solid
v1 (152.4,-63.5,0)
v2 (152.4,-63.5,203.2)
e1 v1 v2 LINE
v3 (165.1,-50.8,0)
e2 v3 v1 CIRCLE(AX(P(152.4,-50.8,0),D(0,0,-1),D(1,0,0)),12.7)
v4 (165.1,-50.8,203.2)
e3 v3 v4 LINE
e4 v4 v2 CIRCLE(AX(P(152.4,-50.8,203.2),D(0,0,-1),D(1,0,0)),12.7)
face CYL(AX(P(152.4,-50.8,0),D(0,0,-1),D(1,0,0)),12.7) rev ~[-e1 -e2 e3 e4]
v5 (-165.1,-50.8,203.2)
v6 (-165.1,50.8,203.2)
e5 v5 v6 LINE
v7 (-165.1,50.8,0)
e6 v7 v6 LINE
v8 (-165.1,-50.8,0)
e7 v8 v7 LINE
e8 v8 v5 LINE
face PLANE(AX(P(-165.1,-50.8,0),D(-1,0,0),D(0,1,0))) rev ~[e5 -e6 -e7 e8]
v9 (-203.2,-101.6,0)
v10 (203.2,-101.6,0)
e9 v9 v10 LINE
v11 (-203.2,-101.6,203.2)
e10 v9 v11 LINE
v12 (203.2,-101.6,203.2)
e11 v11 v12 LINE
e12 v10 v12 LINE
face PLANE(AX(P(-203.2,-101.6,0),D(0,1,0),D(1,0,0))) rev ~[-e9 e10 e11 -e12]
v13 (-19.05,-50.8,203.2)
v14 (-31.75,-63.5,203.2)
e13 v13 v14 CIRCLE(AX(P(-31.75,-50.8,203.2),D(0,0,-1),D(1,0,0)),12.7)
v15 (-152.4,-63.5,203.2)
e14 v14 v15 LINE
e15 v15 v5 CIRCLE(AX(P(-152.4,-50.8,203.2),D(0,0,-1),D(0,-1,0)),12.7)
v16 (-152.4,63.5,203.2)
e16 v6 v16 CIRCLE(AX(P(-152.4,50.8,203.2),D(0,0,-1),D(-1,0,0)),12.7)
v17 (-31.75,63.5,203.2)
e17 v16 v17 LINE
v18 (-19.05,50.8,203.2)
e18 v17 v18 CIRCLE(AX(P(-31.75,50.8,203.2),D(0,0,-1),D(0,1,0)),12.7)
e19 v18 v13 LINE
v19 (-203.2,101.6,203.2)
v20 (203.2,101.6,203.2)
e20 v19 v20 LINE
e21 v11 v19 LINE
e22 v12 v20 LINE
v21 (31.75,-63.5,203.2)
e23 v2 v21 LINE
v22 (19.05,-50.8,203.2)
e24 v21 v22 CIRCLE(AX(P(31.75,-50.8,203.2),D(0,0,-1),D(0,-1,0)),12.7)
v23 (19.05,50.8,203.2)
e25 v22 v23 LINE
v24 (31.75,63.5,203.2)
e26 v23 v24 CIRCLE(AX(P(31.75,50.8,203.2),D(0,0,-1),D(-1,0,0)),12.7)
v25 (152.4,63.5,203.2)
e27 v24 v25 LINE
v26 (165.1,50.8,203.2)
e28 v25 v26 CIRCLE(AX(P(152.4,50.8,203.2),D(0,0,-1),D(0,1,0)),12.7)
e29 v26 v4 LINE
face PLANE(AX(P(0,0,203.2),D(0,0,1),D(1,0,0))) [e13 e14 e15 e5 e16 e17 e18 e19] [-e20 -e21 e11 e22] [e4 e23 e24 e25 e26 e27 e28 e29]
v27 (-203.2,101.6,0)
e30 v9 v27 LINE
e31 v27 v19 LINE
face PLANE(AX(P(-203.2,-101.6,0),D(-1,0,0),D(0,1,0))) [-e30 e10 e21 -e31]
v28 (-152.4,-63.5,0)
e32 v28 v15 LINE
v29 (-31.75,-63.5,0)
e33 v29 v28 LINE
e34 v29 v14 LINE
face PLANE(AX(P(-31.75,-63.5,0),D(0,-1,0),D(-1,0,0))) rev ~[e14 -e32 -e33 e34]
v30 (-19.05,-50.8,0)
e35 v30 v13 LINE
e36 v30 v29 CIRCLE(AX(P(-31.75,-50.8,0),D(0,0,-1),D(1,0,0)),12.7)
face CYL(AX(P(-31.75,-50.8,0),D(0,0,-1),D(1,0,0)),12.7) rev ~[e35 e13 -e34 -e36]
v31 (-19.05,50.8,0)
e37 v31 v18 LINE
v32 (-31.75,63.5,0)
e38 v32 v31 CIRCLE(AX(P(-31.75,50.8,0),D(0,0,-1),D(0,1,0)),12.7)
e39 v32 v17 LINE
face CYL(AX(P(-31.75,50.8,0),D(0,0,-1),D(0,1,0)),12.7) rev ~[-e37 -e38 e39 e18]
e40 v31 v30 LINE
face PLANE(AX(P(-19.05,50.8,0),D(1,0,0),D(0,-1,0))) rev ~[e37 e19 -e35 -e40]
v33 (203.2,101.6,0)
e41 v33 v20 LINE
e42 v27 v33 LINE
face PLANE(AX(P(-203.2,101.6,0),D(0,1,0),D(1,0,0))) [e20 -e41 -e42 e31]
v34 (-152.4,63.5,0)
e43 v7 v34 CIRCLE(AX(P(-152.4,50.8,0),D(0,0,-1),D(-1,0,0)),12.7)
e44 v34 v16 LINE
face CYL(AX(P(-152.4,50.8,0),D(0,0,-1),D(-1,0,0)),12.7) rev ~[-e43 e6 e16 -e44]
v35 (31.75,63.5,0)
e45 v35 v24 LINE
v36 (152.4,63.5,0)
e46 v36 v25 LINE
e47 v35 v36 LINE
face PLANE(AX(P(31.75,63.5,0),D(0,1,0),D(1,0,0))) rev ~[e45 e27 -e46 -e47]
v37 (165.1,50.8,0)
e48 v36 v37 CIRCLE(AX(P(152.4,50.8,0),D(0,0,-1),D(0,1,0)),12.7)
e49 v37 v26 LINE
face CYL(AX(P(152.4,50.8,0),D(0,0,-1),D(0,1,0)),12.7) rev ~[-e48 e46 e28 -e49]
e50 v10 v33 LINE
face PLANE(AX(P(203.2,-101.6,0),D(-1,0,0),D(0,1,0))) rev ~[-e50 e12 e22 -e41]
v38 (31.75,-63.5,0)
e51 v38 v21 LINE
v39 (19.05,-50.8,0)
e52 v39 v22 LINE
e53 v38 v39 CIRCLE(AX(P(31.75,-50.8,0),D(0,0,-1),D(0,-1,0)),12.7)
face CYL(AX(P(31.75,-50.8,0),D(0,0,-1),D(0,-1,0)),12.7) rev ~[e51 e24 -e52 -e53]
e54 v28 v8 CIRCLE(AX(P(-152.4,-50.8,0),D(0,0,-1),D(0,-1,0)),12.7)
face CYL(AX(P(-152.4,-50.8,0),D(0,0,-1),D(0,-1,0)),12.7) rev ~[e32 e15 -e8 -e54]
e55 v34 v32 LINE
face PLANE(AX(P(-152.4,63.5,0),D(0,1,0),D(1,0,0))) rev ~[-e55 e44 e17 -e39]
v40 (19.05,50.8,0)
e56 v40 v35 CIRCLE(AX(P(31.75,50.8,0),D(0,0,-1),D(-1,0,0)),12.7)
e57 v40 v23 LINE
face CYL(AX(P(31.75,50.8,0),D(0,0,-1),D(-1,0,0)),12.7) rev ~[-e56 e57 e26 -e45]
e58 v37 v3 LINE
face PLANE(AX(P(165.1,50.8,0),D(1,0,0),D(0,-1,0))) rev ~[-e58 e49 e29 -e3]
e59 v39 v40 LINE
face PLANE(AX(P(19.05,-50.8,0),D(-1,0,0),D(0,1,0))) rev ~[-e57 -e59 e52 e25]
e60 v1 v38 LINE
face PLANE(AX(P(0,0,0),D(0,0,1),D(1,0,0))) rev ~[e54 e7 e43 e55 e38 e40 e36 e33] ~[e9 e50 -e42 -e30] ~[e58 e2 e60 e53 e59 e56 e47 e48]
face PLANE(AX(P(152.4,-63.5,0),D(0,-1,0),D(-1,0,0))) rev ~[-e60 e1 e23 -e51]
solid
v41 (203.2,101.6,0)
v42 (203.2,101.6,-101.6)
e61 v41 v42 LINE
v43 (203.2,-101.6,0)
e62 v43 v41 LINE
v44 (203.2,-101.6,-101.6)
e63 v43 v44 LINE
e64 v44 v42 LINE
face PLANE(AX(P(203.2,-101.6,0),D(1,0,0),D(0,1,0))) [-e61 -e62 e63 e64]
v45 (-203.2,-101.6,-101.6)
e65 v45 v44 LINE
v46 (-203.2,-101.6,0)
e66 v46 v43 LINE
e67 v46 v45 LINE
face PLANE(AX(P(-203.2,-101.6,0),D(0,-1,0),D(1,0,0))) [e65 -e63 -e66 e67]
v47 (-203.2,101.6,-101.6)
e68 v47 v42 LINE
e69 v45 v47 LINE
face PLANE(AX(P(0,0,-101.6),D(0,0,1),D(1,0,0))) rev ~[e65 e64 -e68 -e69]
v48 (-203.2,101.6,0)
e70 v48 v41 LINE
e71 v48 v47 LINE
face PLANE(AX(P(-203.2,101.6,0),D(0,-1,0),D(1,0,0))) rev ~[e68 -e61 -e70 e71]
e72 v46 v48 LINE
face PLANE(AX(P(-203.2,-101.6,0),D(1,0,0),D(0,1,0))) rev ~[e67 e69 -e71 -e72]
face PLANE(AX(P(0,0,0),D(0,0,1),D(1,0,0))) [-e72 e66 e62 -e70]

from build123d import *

# Parameters (mm, degrees)
F1_W     = 406.4
F1_H     = 203.2
F2_DEPTH = 203.2
F3_DEPTH = 101.6


# Not quite as in the source:
# - a variable given as a bare number and used for a length is read in inches; the dataset says mm whatever the document's units were


with BuildPart() as f2:
    # F1 (on Top) → F2 (new body)
    with BuildSketch(Plane.XY):
        Rectangle(F1_W, F1_H)
        with BuildLine():
            ThreePointArc((-165.1, 50.8), (-161.3802561211, 59.7802561211), (-152.4, 63.5))
            Line((-152.4, 63.5), (-31.75, 63.5))
            ThreePointArc((-31.75, 63.5), (-22.7697438789, 59.7802561211), (-19.05, 50.8))
            Line((-19.05, 50.8), (-19.05, -50.8))
            ThreePointArc((-19.05, -50.8), (-22.7697438789, -59.7802561211), (-31.75, -63.5))
            Line((-31.75, -63.5), (-152.4, -63.5))
            ThreePointArc((-152.4, -63.5), (-161.3802561211, -59.7802561211), (-165.1, -50.8))
            Line((-165.1, -50.8), (-165.1, 50.8))
        make_face(mode=Mode.SUBTRACT)
        with BuildLine():
            Line((19.05, -50.8), (19.05, 50.8))
            ThreePointArc((19.05, 50.8), (22.7697438789, 59.7802561211), (31.75, 63.5))
            Line((31.75, 63.5), (152.4, 63.5))
            ThreePointArc((152.4, 63.5), (161.3802561211, 59.7802561211), (165.1, 50.8))
            Line((165.1, 50.8), (165.1, -50.8))
            ThreePointArc((165.1, -50.8), (161.3802561211, -59.7802561211), (152.4, -63.5))
            Line((152.4, -63.5), (31.75, -63.5))
            ThreePointArc((31.75, -63.5), (22.7697438789, -59.7802561211), (19.05, -50.8))
        make_face(mode=Mode.SUBTRACT)
    extrude(amount=F2_DEPTH)


with BuildPart() as f3:
    # F1 (on Top) → F3 (new body)
    with BuildSketch(Plane.XY):
        Rectangle(F1_W, F1_H)
        with BuildLine():
            ThreePointArc((-165.1, 50.8), (-161.3802561211, 59.7802561211), (-152.4, 63.5))
            Line((-152.4, 63.5), (-31.75, 63.5))
            ThreePointArc((-31.75, 63.5), (-22.7697438789, 59.7802561211), (-19.05, 50.8))
            Line((-19.05, 50.8), (-19.05, -50.8))
            ThreePointArc((-19.05, -50.8), (-22.7697438789, -59.7802561211), (-31.75, -63.5))
            Line((-31.75, -63.5), (-152.4, -63.5))
            ThreePointArc((-152.4, -63.5), (-161.3802561211, -59.7802561211), (-165.1, -50.8))
            Line((-165.1, -50.8), (-165.1, 50.8))
        make_face(mode=Mode.SUBTRACT)
        with BuildLine():
            Line((19.05, -50.8), (19.05, 50.8))
            ThreePointArc((19.05, 50.8), (22.7697438789, 59.7802561211), (31.75, 63.5))
            Line((31.75, 63.5), (152.4, 63.5))
            ThreePointArc((152.4, 63.5), (161.3802561211, 59.7802561211), (165.1, 50.8))
            Line((165.1, 50.8), (165.1, -50.8))
            ThreePointArc((165.1, -50.8), (161.3802561211, -59.7802561211), (152.4, -63.5))
            Line((152.4, -63.5), (31.75, -63.5))
            ThreePointArc((31.75, -63.5), (22.7697438789, -59.7802561211), (19.05, -50.8))
        make_face(mode=Mode.SUBTRACT)
        with BuildLine():
            Line((-31.75, 63.5), (-152.4, 63.5))
            ThreePointArc((-152.4, 63.5), (-161.3802561211, 59.7802561211), (-165.1, 50.8))
            Line((-165.1, 50.8), (-165.1, -50.8))
            ThreePointArc((-165.1, -50.8), (-161.3802561211, -59.7802561211), (-152.4, -63.5))
            Line((-152.4, -63.5), (-31.75, -63.5))
            ThreePointArc((-31.75, -63.5), (-22.7697438789, -59.7802561211), (-19.05, -50.8))
            Line((-19.05, -50.8), (-19.05, 50.8))
            ThreePointArc((-19.05, 50.8), (-22.7697438789, 59.7802561211), (-31.75, 63.5))
        make_face()
        with BuildLine():
            ThreePointArc((31.75, 63.5), (22.7697438789, 59.7802561211), (19.05, 50.8))
            Line((19.05, 50.8), (19.05, -50.8))
            ThreePointArc((19.05, -50.8), (22.7697438789, -59.7802561211), (31.75, -63.5))
            Line((31.75, -63.5), (152.4, -63.5))
            ThreePointArc((152.4, -63.5), (161.3802561211, -59.7802561211), (165.1, -50.8))
            Line((165.1, -50.8), (165.1, 50.8))
            ThreePointArc((165.1, 50.8), (161.3802561211, 59.7802561211), (152.4, 63.5))
            Line((152.4, 63.5), (31.75, 63.5))
        make_face()
    extrude(amount=-F3_DEPTH)


solid = Compound([f2.part, f3.part])
